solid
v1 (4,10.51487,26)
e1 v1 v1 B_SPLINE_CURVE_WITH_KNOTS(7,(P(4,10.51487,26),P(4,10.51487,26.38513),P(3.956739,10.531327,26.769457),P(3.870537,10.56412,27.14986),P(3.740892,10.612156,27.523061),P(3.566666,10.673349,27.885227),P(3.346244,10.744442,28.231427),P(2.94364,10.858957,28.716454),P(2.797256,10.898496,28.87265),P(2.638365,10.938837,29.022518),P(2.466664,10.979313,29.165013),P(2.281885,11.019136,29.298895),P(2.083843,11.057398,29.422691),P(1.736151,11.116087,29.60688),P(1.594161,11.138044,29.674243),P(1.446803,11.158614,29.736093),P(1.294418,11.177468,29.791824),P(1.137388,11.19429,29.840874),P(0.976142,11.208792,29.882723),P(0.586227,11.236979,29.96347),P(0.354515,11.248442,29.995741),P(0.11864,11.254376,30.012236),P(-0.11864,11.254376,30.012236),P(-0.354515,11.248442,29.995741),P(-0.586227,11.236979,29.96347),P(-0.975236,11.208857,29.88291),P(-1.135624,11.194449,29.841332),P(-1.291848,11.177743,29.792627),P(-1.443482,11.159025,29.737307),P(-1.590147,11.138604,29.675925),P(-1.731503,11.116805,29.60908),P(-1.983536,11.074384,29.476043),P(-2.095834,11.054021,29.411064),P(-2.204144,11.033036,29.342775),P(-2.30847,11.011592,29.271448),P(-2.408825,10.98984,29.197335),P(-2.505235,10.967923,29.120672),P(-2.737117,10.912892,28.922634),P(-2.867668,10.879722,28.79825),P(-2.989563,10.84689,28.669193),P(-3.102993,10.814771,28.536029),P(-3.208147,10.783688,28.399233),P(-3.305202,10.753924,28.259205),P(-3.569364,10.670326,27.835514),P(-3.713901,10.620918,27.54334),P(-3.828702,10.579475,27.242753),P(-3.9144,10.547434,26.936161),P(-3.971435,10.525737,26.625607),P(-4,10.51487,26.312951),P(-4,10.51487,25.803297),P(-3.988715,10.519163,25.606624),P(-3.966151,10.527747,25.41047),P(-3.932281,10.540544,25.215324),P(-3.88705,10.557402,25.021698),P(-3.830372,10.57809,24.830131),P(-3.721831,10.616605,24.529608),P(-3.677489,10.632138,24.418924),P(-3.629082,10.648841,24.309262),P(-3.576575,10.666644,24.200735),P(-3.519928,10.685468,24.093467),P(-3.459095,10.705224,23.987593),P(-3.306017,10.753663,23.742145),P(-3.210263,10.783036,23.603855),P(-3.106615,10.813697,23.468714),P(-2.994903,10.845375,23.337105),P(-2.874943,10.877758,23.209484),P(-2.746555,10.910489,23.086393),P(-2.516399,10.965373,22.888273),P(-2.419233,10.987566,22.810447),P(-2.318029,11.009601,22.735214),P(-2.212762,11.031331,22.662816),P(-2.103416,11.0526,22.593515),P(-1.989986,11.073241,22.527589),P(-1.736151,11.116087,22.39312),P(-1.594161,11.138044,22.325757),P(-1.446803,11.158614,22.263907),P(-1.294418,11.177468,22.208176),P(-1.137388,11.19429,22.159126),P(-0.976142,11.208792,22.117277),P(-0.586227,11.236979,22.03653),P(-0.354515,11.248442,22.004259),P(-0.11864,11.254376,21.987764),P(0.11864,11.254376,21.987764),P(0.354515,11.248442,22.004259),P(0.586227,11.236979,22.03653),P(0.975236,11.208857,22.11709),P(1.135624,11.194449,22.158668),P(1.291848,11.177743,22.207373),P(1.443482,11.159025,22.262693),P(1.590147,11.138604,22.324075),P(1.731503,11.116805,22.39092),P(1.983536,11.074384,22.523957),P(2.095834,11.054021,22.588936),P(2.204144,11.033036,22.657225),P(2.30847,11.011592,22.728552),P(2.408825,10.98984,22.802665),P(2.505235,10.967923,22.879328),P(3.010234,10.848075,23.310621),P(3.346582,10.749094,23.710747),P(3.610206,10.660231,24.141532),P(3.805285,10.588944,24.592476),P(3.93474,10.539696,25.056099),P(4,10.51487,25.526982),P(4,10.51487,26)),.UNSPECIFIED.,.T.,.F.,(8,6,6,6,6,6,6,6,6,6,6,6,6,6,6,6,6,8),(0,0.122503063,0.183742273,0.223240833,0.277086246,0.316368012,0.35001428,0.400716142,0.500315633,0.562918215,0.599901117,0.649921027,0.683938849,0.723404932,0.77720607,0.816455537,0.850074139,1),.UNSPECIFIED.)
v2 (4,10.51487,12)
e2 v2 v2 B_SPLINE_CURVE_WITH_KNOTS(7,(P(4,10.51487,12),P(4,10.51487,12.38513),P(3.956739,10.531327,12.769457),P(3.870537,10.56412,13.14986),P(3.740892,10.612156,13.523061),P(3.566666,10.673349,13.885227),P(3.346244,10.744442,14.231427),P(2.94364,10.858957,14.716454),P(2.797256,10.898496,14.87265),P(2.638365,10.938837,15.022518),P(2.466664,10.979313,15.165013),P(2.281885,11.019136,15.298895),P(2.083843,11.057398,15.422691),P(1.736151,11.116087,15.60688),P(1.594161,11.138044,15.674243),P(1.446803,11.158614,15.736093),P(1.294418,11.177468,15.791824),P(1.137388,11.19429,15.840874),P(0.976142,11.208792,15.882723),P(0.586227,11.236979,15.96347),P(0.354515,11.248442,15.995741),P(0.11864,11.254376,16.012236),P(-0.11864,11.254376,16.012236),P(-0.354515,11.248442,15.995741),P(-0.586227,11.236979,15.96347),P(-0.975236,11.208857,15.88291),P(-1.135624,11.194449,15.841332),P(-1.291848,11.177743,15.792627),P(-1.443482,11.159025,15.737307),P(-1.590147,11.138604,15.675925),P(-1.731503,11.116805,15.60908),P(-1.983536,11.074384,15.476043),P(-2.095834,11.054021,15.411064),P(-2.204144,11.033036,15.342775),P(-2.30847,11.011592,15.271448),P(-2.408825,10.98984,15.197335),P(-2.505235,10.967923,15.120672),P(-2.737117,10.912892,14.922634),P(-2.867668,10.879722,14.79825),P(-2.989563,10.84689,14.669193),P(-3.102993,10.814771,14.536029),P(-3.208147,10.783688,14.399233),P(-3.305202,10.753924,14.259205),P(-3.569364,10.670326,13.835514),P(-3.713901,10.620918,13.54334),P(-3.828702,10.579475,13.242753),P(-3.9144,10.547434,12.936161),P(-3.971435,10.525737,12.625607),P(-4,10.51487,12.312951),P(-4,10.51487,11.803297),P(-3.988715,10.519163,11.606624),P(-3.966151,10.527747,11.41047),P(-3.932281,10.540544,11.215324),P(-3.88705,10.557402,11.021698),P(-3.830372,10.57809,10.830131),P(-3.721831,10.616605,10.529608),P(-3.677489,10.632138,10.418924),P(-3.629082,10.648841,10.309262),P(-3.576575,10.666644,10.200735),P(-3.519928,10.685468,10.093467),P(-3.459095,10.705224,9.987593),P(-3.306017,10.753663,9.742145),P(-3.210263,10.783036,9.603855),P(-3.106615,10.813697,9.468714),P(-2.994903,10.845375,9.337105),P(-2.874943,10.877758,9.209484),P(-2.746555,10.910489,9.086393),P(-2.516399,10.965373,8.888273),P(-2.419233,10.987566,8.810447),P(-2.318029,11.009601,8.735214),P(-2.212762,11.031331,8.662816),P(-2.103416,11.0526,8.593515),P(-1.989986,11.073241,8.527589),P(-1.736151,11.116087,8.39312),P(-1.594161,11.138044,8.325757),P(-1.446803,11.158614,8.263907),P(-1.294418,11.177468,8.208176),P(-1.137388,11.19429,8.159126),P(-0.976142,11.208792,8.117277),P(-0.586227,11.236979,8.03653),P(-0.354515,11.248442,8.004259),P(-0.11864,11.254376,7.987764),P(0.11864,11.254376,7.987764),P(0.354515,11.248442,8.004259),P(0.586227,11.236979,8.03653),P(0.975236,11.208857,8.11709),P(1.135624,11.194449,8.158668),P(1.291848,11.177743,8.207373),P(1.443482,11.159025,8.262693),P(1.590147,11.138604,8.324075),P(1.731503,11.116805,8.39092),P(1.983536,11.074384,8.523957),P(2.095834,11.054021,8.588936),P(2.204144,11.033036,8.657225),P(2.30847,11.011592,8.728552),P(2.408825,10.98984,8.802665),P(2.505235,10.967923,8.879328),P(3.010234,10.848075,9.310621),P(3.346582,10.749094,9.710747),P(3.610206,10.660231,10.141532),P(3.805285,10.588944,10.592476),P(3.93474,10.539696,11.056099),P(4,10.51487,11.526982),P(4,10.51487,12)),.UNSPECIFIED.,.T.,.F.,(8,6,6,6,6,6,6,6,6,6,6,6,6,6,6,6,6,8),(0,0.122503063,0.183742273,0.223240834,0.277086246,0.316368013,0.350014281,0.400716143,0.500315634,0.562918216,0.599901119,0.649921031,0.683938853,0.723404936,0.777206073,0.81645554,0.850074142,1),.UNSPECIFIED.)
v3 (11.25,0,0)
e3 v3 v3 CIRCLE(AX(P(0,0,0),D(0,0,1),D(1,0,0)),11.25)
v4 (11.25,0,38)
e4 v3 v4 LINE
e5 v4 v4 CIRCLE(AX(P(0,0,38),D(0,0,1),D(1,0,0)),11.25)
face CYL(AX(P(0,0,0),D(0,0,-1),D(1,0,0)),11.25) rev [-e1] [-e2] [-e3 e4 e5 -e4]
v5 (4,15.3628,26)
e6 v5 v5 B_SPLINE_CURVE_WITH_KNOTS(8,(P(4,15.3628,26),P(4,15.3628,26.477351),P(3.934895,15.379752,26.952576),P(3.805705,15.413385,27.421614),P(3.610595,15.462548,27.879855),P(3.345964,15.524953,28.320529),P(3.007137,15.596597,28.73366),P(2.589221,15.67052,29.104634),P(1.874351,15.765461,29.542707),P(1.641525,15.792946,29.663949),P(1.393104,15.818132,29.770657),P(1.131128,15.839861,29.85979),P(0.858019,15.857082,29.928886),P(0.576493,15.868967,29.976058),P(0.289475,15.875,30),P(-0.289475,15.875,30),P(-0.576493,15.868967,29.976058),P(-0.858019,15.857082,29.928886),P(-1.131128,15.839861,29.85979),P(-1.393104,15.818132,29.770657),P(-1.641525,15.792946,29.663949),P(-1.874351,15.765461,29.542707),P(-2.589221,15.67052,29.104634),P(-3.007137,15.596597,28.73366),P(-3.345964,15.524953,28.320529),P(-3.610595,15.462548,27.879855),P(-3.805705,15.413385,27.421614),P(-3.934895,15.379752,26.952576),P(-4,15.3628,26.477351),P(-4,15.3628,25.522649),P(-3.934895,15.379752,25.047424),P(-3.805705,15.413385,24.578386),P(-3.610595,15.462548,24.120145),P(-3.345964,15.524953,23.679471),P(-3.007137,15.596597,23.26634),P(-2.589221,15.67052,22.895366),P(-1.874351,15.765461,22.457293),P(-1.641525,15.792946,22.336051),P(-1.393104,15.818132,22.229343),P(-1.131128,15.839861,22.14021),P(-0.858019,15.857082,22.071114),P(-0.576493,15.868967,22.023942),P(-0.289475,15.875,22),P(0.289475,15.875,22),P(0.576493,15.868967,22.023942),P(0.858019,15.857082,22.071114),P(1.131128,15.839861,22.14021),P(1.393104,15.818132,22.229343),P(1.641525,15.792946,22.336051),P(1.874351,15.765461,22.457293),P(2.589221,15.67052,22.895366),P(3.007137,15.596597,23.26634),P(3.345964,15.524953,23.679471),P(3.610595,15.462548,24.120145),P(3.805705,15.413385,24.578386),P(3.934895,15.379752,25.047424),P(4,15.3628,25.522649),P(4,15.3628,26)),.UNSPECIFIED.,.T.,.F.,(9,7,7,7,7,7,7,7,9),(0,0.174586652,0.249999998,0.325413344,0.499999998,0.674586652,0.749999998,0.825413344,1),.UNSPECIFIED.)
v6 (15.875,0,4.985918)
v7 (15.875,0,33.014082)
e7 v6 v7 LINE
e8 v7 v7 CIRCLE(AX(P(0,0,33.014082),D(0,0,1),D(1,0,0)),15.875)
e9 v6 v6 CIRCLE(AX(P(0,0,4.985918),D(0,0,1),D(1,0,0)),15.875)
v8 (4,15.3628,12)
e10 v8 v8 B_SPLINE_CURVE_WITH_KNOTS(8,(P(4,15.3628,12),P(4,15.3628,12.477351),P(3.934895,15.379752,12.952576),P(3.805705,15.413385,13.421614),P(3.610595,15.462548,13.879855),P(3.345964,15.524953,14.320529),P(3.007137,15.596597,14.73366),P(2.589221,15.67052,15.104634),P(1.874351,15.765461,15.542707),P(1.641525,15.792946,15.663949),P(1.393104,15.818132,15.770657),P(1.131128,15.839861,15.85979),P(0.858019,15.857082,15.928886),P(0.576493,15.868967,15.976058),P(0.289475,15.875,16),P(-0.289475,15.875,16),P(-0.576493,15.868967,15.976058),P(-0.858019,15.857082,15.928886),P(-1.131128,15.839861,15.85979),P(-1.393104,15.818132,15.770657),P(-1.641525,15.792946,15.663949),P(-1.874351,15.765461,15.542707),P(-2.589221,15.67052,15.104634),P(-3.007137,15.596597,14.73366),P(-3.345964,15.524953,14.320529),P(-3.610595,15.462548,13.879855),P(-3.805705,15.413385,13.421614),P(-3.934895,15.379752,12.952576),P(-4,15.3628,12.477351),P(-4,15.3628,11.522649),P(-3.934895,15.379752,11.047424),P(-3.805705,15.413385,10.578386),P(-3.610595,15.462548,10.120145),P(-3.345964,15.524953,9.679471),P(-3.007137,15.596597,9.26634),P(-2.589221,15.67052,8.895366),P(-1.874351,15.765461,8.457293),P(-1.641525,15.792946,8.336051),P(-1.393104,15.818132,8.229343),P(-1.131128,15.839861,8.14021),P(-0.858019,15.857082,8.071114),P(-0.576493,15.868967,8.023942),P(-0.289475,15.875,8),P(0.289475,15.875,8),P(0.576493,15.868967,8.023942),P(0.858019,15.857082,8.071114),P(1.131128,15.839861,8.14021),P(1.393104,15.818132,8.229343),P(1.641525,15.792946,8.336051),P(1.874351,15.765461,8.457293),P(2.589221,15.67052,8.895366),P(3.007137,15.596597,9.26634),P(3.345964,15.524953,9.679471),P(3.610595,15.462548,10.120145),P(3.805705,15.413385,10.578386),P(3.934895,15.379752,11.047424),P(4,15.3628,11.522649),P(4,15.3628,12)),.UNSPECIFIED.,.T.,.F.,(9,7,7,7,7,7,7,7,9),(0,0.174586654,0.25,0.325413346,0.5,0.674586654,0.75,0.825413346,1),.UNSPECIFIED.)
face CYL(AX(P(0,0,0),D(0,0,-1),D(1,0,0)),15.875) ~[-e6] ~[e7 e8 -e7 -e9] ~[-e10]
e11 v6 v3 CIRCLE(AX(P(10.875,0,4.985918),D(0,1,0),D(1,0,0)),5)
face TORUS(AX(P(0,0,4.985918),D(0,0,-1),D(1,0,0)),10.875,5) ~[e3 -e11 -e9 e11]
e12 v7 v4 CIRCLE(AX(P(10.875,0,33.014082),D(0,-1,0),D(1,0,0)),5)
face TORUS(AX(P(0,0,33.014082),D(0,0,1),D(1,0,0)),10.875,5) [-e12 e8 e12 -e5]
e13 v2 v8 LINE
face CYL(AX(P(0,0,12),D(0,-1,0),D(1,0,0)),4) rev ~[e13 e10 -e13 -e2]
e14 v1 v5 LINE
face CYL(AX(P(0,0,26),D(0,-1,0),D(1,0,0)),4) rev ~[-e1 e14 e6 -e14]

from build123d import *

# Parameters (mm, degrees)
F0_R     = 15.875
F0_R_2   = 11.25
F1_DEPTH = 38
F3_R     = 4
F4_DEPTH = 15.876


# Not quite as in the source:
# - a fillet or chamfer that OpenCascade refuses, or shapes differently, is made with other operations: its cross-section is extruded or revolved along the edge and cut away or added


with BuildPart() as f1:
    # F0 (on Top) → F1 (new body)
    with BuildSketch(Plane.XY):
        Circle(F0_R)
        Circle(F0_R_2, mode=Mode.SUBTRACT)
    extrude(amount=F1_DEPTH)

    # F2: fillet of radius 5 on 2 edges, made by hand

    # F2_s1 → F2_t2 (revolve, cut)
    with BuildSketch(Plane.XZ):
        with BuildLine():
            ThreePointArc((15.875, 33.0140823312), (14.5407195747, 36.4144499584), (11.25, 38))
            Line((11.25, 38), (15.875, 38))
            Line((15.875, 38), (15.875, 33.0140823312))
        make_face()
    revolve(axis=Axis((0, 0, 38), (0, 0, 1)), mode=Mode.SUBTRACT)

    # F2_s3 → F2_t4 (revolve, cut)
    with BuildSketch(Plane.XZ):
        with BuildLine():
            ThreePointArc((15.875, 4.9859176688), (14.5407195747, 1.5855500416), (11.25, 0))
            Line((11.25, 0), (15.875, 0))
            Line((15.875, 0), (15.875, 4.9859176688))
        make_face()
    revolve(axis=Axis((0, 0, 0), (0, 0, 1)), mode=Mode.SUBTRACT)

    # F3 (on Front) → F4 (cut, through all)
    with BuildSketch(Plane.XZ):
        with Locations((0, 12)):
            Circle(F3_R)
        with Locations((0, 26)):
            Circle(F3_R)
    extrude(amount=-F4_DEPTH, mode=Mode.SUBTRACT)


solid = f1.part
